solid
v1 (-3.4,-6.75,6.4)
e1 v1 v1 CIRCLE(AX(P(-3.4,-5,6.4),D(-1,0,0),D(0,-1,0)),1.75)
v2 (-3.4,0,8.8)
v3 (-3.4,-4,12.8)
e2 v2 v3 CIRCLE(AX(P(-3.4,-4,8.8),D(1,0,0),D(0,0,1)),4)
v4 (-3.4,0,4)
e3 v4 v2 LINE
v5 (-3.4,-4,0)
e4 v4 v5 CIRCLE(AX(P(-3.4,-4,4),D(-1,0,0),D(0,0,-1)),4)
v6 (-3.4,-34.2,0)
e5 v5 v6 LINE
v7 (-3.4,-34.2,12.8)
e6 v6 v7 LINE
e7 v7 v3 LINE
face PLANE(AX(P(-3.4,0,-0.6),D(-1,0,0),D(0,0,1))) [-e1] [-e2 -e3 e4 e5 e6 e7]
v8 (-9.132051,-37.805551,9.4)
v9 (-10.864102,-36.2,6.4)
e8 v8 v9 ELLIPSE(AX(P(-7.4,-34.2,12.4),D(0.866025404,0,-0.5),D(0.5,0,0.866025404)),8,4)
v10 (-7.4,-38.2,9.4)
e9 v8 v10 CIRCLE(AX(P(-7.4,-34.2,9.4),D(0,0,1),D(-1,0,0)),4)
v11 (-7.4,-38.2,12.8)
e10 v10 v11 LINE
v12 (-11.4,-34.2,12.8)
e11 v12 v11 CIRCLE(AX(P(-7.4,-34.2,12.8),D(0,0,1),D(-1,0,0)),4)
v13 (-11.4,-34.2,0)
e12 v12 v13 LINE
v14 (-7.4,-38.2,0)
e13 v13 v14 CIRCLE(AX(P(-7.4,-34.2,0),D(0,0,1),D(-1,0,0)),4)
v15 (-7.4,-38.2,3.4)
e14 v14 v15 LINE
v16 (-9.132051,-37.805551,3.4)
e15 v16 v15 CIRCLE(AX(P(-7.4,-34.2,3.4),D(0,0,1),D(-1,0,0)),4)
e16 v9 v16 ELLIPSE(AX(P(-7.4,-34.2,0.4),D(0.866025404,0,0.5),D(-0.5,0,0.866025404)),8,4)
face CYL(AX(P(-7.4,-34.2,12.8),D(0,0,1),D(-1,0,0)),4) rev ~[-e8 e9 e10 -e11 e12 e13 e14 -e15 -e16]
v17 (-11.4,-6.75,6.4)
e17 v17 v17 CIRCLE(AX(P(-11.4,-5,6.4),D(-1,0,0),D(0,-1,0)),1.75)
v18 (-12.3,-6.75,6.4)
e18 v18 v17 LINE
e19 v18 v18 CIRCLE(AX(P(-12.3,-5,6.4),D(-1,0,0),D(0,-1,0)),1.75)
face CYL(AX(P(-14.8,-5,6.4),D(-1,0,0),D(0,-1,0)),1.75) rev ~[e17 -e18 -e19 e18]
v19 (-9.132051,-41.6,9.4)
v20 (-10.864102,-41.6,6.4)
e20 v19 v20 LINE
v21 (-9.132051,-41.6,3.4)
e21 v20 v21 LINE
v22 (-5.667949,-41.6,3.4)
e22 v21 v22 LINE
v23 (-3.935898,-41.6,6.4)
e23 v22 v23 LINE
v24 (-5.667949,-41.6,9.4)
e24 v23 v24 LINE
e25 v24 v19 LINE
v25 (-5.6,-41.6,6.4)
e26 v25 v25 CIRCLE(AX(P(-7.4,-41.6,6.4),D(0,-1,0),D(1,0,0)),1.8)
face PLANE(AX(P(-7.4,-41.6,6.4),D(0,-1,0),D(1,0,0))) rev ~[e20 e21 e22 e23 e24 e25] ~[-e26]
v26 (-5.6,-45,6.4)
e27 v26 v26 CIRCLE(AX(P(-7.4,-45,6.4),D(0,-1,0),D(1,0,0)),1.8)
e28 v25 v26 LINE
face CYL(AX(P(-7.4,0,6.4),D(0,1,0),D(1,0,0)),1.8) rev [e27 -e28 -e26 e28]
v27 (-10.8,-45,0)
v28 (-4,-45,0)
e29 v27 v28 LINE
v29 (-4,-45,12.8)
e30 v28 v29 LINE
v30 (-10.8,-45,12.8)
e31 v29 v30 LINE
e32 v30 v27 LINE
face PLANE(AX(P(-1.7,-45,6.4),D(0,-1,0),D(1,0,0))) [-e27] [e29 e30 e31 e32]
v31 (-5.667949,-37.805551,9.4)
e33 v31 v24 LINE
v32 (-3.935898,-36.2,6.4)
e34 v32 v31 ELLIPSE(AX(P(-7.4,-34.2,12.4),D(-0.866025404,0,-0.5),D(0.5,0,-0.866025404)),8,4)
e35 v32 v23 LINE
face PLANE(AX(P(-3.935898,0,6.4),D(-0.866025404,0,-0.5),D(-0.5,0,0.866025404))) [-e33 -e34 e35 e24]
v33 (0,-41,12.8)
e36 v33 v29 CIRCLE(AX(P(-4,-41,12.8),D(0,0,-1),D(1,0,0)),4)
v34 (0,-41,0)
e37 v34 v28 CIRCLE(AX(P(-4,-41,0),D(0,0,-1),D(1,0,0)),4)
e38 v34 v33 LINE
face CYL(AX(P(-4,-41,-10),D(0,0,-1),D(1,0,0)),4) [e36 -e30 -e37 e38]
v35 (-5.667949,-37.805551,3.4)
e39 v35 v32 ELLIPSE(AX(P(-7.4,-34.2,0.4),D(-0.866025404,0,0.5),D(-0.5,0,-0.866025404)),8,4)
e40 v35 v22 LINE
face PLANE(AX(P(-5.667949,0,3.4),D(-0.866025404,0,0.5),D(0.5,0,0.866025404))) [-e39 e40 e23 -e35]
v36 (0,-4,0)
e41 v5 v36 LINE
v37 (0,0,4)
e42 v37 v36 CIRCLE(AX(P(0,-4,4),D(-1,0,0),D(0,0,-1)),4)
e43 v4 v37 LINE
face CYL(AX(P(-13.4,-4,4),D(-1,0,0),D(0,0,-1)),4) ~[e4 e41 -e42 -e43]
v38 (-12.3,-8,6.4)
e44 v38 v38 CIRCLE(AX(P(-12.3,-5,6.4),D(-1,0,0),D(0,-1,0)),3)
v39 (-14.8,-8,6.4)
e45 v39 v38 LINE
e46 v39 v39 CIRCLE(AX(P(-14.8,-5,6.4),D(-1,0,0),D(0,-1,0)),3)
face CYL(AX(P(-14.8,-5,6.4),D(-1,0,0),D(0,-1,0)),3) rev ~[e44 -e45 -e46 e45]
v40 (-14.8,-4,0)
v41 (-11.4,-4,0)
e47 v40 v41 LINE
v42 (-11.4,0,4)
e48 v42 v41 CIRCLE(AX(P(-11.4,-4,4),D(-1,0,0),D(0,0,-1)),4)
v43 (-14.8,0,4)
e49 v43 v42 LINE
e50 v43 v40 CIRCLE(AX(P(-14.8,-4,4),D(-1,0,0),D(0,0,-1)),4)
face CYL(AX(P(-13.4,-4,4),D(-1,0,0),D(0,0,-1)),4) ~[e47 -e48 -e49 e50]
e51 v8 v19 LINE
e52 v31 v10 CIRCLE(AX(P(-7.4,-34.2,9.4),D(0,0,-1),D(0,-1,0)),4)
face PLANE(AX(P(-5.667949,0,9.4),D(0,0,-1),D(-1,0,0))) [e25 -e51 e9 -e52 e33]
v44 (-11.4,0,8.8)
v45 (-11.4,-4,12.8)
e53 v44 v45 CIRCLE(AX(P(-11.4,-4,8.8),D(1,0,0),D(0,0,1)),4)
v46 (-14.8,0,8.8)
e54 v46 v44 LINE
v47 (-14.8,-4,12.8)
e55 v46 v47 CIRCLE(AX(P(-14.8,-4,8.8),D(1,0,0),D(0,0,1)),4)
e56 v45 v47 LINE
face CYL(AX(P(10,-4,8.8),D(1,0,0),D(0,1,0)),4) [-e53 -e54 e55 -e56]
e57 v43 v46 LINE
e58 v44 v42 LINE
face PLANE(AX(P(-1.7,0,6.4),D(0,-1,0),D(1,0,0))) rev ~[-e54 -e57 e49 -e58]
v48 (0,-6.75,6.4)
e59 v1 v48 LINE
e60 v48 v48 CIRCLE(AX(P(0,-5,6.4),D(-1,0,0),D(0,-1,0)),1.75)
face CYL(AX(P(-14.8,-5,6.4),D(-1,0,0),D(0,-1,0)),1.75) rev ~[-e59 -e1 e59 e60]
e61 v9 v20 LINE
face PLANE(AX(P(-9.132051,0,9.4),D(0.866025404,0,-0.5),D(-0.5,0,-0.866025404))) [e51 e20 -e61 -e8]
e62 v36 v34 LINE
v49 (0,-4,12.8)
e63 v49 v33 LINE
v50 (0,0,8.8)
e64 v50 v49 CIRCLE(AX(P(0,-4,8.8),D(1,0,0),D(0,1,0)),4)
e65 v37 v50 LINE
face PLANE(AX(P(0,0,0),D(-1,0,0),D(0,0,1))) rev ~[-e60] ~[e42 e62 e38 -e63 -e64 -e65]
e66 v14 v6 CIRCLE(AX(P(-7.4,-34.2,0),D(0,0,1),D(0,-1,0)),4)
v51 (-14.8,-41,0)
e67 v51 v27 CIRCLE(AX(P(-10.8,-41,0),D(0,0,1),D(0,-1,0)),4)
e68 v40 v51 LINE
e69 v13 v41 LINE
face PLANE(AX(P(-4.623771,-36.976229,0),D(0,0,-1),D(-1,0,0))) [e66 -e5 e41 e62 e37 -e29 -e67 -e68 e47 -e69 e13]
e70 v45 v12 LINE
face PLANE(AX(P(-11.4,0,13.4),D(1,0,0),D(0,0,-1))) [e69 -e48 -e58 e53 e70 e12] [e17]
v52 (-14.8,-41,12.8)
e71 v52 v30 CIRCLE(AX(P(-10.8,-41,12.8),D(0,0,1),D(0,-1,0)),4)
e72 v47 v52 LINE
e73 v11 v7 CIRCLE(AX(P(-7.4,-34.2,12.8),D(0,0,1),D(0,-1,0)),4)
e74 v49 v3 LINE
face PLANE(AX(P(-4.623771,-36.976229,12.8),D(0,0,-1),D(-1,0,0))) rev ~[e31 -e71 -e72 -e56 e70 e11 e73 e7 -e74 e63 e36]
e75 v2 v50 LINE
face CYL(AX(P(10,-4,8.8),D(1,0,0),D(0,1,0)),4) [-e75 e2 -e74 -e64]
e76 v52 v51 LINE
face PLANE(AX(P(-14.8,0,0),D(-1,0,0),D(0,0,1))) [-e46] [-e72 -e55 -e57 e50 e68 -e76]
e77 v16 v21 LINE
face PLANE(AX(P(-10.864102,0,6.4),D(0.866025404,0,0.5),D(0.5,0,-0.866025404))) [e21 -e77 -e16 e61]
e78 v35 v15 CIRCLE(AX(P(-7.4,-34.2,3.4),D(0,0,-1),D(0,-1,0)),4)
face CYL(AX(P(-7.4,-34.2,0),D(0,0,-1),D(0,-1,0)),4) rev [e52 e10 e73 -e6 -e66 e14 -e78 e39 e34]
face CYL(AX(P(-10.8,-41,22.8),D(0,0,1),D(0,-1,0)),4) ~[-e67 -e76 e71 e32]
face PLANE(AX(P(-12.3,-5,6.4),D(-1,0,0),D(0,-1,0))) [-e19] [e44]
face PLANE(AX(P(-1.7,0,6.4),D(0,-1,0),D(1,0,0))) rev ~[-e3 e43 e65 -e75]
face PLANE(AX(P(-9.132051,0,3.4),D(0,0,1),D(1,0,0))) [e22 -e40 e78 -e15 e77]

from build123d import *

# Parameters (mm, degrees)
F0_W         = 3.4
F0_H         = 12.8
F0_W_2       = 8
F0_R         = 1.8
F1_DEPTH     = 45
F2_R         = 1.75
F3_DEPTH     = 25
F2_R_2       = 3
F4_DEPTH     = 2.5
F0_H_2       = 0.6
F5_DEPTH     = 38.2
F6_T3_DEPTH  = 12.8
F6_S4_R      = 1.8
F6_T5_DEPTH  = 8
F6_T8_DEPTH  = 12.8
F6_S9_R      = 1.8
F6_T10_DEPTH = 8
F6_T14_DEPTH = 23.4
F6_T17_DEPTH = 23.4
F6_T20_DEPTH = 23.4
F6_T23_DEPTH = 23.4
F6_T26_DEPTH = 32.8
F6_T29_DEPTH = 32.8
F7_DEPTH     = 41.6


# Not quite as in the source:
# - a fillet or chamfer that OpenCascade refuses, or shapes differently, is made with other operations: its cross-section is extruded or revolved along the edge and cut away or added


with BuildPart() as f1:
    # F0 (on Front) → F1 (new body)
    with BuildSketch(Plane.XZ):
        with Locations((-1.7, 6.4)):
            Rectangle(F0_W, F0_H)
        with Locations((-7.4, 6.4)):
            Rectangle(F0_W_2, F0_H)
        Polygon((-10.8641016151, 6.4), (-9.1320508076, 9.4), (-5.6679491924, 9.4), (-3.9358983849, 6.4), (-5.6679491924, 3.4), (-9.1320508076, 3.4), align=None, mode=Mode.SUBTRACT)
        with Locations((-13.1, 6.4)):
            Rectangle(F0_W, F0_H)
        Polygon((-5.6679491924, 9.4), (-9.1320508076, 9.4), (-10.8641016151, 6.4), (-9.1320508076, 3.4), (-5.6679491924, 3.4), (-3.9358983849, 6.4), align=None)
        with Locations((-7.4, 6.4)):
            Circle(F0_R, mode=Mode.SUBTRACT)
    extrude(amount=F1_DEPTH)

    # F2 (on face) → F3 (cut)
    with BuildSketch(Plane(origin=(-14.8, 0, 0), x_dir=(0, -1, 0), z_dir=(-1, 0, 0))):
        with Locations((5, 6.4)):
            Circle(F2_R)
    extrude(amount=-F3_DEPTH, mode=Mode.SUBTRACT)

    # F2 (on face) → F4 (cut)
    with BuildSketch(Plane(origin=(-14.8, 0, 0), x_dir=(0, -1, 0), z_dir=(-1, 0, 0))):
        with Locations((5, 6.4)):
            Circle(F2_R_2)
        with Locations((5, 6.4)):
            Circle(F2_R, mode=Mode.SUBTRACT)
    extrude(amount=-F4_DEPTH, mode=Mode.SUBTRACT)

    # F0 (on Front) → F5 (cut)
    with BuildSketch(Plane.XZ):
        with Locations((-7.4, 13.1)):
            Rectangle(F0_W_2, F0_H_2)
        with Locations((-7.4, 6.4)):
            Rectangle(F0_W_2, F0_H)
        Polygon((-10.8641016151, 6.4), (-9.1320508076, 9.4), (-5.6679491924, 9.4), (-3.9358983849, 6.4), (-5.6679491924, 3.4), (-9.1320508076, 3.4), align=None, mode=Mode.SUBTRACT)
        with Locations((-7.4, -0.3)):
            Rectangle(F0_W_2, F0_H_2)
        Polygon((-5.6679491924, 9.4), (-9.1320508076, 9.4), (-10.8641016151, 6.4), (-9.1320508076, 3.4), (-5.6679491924, 3.4), (-3.9358983849, 6.4), align=None)
        with Locations((-7.4, 6.4)):
            Circle(F0_R, mode=Mode.SUBTRACT)
    extrude(amount=F5_DEPTH, mode=Mode.SUBTRACT)

    # F6: fillet of radius 4 on 8 edges, made by hand


with BuildPart() as f6_tool1:
    # F6_s2 → F6_t3 (new body)
    with BuildSketch(Plane.XY):
        with BuildLine():
            ThreePointArc((-7.4, -38.2), (-4.5715728753, -37.0284271247), (-3.4, -34.2))
            Line((-3.4, -34.2), (-3.4, -38.2))
            Line((-3.4, -38.2), (-7.4, -38.2))
        make_face()
    extrude(amount=F6_T3_DEPTH)

    # F6_s4 → F6_t5 (cut, symmetric)
    with BuildSketch(Plane.XZ.offset(36.2)):
        with Locations((-7.4, 6.4)):
            Circle(F6_S4_R)
    extrude(amount=F6_T5_DEPTH, both=True, mode=Mode.SUBTRACT)


with BuildPart() as f6_tool6:
    # F6_s7 → F6_t8 (new body)
    with BuildSketch(Plane.XY.offset(12.8)):
        with BuildLine():
            ThreePointArc((-11.4, -34.2), (-10.2284271247, -37.0284271247), (-7.4, -38.2))
            Line((-7.4, -38.2), (-11.4, -38.2))
            Line((-11.4, -38.2), (-11.4, -34.2))
        make_face()
    extrude(amount=-F6_T8_DEPTH)

    # F6_s9 → F6_t10 (cut, symmetric)
    with BuildSketch(Plane.XZ.offset(36.2)):
        with Locations((-7.4, 6.4)):
            Circle(F6_S9_R)
    extrude(amount=F6_T10_DEPTH, both=True, mode=Mode.SUBTRACT)


with BuildPart() as f1_1:
    add(f1.part)

    # F6_t11: union F6_tool1, F6_tool6
    add([f6_tool1.part, f6_tool6.part])


with BuildPart() as f6_tool12:
    # F6_s13 → F6_t14 (new body)
    with BuildSketch(Plane.YZ.offset(10)):
        with BuildLine():
            ThreePointArc((0, 8.8), (-1.1715728753, 11.6284271247), (-4, 12.8))
            Line((-4, 12.8), (0, 12.8))
            Line((0, 12.8), (0, 8.8))
        make_face()
    extrude(amount=-F6_T14_DEPTH)


with BuildPart() as f6_tool15:
    # F6_s16 → F6_t17 (new body)
    with BuildSketch(Plane.YZ.offset(-13.4)):
        with BuildLine():
            ThreePointArc((-4, 0), (-1.1715728753, 1.1715728753), (0, 4))
            Line((0, 4), (0, 0))
            Line((0, 0), (-4, 0))
        make_face()
    extrude(amount=F6_T17_DEPTH)


with BuildPart() as f6_tool18:
    # F6_s19 → F6_t20 (new body)
    with BuildSketch(Plane.YZ.offset(-24.8)):
        with BuildLine():
            ThreePointArc((-4, 0), (-1.1715728753, 1.1715728753), (0, 4))
            Line((0, 4), (0, 0))
            Line((0, 0), (-4, 0))
        make_face()
    extrude(amount=F6_T20_DEPTH)


with BuildPart() as f6_tool21:
    # F6_s22 → F6_t23 (new body)
    with BuildSketch(Plane.YZ.offset(-1.4)):
        with BuildLine():
            ThreePointArc((-4, 12.8), (-1.1715728753, 11.6284271247), (0, 8.8))
            Line((0, 8.8), (0, 12.8))
            Line((0, 12.8), (-4, 12.8))
        make_face()
    extrude(amount=-F6_T23_DEPTH)


with BuildPart() as f6_tool24:
    # F6_s25 → F6_t26 (new body)
    with BuildSketch(Plane.XY.offset(22.8)):
        with BuildLine():
            ThreePointArc((-10.8, -45), (-13.6284271247, -43.8284271247), (-14.8, -41))
            Line((-14.8, -41), (-14.8, -45))
            Line((-14.8, -45), (-10.8, -45))
        make_face()
    extrude(amount=-F6_T26_DEPTH)


with BuildPart() as f6_tool27:
    # F6_s28 → F6_t29 (new body)
    with BuildSketch(Plane.XY.offset(-10)):
        with BuildLine():
            ThreePointArc((0, -41), (-1.1715728753, -43.8284271247), (-4, -45))
            Line((-4, -45), (0, -45))
            Line((0, -45), (0, -41))
        make_face()
    extrude(amount=F6_T29_DEPTH)


with BuildPart() as f1_2:
    add(f1_1.part)

    # F6_t30: cut F6_tool12, F6_tool15, F6_tool18, F6_tool21, F6_tool24, F6_tool27
    add([f6_tool12.part, f6_tool15.part, f6_tool18.part, f6_tool21.part, f6_tool24.part, f6_tool27.part], mode=Mode.SUBTRACT)

    # F0 (on Front) → F7 (cut)
    with BuildSketch(Plane.XZ):
        Polygon((-5.6679491924, 9.4), (-9.1320508076, 9.4), (-10.8641016151, 6.4), (-9.1320508076, 3.4), (-5.6679491924, 3.4), (-3.9358983849, 6.4), align=None)
        with Locations((-7.4, 6.4)):
            Circle(F0_R, mode=Mode.SUBTRACT)
    extrude(amount=F7_DEPTH, mode=Mode.SUBTRACT)


solid = f1_2.part
